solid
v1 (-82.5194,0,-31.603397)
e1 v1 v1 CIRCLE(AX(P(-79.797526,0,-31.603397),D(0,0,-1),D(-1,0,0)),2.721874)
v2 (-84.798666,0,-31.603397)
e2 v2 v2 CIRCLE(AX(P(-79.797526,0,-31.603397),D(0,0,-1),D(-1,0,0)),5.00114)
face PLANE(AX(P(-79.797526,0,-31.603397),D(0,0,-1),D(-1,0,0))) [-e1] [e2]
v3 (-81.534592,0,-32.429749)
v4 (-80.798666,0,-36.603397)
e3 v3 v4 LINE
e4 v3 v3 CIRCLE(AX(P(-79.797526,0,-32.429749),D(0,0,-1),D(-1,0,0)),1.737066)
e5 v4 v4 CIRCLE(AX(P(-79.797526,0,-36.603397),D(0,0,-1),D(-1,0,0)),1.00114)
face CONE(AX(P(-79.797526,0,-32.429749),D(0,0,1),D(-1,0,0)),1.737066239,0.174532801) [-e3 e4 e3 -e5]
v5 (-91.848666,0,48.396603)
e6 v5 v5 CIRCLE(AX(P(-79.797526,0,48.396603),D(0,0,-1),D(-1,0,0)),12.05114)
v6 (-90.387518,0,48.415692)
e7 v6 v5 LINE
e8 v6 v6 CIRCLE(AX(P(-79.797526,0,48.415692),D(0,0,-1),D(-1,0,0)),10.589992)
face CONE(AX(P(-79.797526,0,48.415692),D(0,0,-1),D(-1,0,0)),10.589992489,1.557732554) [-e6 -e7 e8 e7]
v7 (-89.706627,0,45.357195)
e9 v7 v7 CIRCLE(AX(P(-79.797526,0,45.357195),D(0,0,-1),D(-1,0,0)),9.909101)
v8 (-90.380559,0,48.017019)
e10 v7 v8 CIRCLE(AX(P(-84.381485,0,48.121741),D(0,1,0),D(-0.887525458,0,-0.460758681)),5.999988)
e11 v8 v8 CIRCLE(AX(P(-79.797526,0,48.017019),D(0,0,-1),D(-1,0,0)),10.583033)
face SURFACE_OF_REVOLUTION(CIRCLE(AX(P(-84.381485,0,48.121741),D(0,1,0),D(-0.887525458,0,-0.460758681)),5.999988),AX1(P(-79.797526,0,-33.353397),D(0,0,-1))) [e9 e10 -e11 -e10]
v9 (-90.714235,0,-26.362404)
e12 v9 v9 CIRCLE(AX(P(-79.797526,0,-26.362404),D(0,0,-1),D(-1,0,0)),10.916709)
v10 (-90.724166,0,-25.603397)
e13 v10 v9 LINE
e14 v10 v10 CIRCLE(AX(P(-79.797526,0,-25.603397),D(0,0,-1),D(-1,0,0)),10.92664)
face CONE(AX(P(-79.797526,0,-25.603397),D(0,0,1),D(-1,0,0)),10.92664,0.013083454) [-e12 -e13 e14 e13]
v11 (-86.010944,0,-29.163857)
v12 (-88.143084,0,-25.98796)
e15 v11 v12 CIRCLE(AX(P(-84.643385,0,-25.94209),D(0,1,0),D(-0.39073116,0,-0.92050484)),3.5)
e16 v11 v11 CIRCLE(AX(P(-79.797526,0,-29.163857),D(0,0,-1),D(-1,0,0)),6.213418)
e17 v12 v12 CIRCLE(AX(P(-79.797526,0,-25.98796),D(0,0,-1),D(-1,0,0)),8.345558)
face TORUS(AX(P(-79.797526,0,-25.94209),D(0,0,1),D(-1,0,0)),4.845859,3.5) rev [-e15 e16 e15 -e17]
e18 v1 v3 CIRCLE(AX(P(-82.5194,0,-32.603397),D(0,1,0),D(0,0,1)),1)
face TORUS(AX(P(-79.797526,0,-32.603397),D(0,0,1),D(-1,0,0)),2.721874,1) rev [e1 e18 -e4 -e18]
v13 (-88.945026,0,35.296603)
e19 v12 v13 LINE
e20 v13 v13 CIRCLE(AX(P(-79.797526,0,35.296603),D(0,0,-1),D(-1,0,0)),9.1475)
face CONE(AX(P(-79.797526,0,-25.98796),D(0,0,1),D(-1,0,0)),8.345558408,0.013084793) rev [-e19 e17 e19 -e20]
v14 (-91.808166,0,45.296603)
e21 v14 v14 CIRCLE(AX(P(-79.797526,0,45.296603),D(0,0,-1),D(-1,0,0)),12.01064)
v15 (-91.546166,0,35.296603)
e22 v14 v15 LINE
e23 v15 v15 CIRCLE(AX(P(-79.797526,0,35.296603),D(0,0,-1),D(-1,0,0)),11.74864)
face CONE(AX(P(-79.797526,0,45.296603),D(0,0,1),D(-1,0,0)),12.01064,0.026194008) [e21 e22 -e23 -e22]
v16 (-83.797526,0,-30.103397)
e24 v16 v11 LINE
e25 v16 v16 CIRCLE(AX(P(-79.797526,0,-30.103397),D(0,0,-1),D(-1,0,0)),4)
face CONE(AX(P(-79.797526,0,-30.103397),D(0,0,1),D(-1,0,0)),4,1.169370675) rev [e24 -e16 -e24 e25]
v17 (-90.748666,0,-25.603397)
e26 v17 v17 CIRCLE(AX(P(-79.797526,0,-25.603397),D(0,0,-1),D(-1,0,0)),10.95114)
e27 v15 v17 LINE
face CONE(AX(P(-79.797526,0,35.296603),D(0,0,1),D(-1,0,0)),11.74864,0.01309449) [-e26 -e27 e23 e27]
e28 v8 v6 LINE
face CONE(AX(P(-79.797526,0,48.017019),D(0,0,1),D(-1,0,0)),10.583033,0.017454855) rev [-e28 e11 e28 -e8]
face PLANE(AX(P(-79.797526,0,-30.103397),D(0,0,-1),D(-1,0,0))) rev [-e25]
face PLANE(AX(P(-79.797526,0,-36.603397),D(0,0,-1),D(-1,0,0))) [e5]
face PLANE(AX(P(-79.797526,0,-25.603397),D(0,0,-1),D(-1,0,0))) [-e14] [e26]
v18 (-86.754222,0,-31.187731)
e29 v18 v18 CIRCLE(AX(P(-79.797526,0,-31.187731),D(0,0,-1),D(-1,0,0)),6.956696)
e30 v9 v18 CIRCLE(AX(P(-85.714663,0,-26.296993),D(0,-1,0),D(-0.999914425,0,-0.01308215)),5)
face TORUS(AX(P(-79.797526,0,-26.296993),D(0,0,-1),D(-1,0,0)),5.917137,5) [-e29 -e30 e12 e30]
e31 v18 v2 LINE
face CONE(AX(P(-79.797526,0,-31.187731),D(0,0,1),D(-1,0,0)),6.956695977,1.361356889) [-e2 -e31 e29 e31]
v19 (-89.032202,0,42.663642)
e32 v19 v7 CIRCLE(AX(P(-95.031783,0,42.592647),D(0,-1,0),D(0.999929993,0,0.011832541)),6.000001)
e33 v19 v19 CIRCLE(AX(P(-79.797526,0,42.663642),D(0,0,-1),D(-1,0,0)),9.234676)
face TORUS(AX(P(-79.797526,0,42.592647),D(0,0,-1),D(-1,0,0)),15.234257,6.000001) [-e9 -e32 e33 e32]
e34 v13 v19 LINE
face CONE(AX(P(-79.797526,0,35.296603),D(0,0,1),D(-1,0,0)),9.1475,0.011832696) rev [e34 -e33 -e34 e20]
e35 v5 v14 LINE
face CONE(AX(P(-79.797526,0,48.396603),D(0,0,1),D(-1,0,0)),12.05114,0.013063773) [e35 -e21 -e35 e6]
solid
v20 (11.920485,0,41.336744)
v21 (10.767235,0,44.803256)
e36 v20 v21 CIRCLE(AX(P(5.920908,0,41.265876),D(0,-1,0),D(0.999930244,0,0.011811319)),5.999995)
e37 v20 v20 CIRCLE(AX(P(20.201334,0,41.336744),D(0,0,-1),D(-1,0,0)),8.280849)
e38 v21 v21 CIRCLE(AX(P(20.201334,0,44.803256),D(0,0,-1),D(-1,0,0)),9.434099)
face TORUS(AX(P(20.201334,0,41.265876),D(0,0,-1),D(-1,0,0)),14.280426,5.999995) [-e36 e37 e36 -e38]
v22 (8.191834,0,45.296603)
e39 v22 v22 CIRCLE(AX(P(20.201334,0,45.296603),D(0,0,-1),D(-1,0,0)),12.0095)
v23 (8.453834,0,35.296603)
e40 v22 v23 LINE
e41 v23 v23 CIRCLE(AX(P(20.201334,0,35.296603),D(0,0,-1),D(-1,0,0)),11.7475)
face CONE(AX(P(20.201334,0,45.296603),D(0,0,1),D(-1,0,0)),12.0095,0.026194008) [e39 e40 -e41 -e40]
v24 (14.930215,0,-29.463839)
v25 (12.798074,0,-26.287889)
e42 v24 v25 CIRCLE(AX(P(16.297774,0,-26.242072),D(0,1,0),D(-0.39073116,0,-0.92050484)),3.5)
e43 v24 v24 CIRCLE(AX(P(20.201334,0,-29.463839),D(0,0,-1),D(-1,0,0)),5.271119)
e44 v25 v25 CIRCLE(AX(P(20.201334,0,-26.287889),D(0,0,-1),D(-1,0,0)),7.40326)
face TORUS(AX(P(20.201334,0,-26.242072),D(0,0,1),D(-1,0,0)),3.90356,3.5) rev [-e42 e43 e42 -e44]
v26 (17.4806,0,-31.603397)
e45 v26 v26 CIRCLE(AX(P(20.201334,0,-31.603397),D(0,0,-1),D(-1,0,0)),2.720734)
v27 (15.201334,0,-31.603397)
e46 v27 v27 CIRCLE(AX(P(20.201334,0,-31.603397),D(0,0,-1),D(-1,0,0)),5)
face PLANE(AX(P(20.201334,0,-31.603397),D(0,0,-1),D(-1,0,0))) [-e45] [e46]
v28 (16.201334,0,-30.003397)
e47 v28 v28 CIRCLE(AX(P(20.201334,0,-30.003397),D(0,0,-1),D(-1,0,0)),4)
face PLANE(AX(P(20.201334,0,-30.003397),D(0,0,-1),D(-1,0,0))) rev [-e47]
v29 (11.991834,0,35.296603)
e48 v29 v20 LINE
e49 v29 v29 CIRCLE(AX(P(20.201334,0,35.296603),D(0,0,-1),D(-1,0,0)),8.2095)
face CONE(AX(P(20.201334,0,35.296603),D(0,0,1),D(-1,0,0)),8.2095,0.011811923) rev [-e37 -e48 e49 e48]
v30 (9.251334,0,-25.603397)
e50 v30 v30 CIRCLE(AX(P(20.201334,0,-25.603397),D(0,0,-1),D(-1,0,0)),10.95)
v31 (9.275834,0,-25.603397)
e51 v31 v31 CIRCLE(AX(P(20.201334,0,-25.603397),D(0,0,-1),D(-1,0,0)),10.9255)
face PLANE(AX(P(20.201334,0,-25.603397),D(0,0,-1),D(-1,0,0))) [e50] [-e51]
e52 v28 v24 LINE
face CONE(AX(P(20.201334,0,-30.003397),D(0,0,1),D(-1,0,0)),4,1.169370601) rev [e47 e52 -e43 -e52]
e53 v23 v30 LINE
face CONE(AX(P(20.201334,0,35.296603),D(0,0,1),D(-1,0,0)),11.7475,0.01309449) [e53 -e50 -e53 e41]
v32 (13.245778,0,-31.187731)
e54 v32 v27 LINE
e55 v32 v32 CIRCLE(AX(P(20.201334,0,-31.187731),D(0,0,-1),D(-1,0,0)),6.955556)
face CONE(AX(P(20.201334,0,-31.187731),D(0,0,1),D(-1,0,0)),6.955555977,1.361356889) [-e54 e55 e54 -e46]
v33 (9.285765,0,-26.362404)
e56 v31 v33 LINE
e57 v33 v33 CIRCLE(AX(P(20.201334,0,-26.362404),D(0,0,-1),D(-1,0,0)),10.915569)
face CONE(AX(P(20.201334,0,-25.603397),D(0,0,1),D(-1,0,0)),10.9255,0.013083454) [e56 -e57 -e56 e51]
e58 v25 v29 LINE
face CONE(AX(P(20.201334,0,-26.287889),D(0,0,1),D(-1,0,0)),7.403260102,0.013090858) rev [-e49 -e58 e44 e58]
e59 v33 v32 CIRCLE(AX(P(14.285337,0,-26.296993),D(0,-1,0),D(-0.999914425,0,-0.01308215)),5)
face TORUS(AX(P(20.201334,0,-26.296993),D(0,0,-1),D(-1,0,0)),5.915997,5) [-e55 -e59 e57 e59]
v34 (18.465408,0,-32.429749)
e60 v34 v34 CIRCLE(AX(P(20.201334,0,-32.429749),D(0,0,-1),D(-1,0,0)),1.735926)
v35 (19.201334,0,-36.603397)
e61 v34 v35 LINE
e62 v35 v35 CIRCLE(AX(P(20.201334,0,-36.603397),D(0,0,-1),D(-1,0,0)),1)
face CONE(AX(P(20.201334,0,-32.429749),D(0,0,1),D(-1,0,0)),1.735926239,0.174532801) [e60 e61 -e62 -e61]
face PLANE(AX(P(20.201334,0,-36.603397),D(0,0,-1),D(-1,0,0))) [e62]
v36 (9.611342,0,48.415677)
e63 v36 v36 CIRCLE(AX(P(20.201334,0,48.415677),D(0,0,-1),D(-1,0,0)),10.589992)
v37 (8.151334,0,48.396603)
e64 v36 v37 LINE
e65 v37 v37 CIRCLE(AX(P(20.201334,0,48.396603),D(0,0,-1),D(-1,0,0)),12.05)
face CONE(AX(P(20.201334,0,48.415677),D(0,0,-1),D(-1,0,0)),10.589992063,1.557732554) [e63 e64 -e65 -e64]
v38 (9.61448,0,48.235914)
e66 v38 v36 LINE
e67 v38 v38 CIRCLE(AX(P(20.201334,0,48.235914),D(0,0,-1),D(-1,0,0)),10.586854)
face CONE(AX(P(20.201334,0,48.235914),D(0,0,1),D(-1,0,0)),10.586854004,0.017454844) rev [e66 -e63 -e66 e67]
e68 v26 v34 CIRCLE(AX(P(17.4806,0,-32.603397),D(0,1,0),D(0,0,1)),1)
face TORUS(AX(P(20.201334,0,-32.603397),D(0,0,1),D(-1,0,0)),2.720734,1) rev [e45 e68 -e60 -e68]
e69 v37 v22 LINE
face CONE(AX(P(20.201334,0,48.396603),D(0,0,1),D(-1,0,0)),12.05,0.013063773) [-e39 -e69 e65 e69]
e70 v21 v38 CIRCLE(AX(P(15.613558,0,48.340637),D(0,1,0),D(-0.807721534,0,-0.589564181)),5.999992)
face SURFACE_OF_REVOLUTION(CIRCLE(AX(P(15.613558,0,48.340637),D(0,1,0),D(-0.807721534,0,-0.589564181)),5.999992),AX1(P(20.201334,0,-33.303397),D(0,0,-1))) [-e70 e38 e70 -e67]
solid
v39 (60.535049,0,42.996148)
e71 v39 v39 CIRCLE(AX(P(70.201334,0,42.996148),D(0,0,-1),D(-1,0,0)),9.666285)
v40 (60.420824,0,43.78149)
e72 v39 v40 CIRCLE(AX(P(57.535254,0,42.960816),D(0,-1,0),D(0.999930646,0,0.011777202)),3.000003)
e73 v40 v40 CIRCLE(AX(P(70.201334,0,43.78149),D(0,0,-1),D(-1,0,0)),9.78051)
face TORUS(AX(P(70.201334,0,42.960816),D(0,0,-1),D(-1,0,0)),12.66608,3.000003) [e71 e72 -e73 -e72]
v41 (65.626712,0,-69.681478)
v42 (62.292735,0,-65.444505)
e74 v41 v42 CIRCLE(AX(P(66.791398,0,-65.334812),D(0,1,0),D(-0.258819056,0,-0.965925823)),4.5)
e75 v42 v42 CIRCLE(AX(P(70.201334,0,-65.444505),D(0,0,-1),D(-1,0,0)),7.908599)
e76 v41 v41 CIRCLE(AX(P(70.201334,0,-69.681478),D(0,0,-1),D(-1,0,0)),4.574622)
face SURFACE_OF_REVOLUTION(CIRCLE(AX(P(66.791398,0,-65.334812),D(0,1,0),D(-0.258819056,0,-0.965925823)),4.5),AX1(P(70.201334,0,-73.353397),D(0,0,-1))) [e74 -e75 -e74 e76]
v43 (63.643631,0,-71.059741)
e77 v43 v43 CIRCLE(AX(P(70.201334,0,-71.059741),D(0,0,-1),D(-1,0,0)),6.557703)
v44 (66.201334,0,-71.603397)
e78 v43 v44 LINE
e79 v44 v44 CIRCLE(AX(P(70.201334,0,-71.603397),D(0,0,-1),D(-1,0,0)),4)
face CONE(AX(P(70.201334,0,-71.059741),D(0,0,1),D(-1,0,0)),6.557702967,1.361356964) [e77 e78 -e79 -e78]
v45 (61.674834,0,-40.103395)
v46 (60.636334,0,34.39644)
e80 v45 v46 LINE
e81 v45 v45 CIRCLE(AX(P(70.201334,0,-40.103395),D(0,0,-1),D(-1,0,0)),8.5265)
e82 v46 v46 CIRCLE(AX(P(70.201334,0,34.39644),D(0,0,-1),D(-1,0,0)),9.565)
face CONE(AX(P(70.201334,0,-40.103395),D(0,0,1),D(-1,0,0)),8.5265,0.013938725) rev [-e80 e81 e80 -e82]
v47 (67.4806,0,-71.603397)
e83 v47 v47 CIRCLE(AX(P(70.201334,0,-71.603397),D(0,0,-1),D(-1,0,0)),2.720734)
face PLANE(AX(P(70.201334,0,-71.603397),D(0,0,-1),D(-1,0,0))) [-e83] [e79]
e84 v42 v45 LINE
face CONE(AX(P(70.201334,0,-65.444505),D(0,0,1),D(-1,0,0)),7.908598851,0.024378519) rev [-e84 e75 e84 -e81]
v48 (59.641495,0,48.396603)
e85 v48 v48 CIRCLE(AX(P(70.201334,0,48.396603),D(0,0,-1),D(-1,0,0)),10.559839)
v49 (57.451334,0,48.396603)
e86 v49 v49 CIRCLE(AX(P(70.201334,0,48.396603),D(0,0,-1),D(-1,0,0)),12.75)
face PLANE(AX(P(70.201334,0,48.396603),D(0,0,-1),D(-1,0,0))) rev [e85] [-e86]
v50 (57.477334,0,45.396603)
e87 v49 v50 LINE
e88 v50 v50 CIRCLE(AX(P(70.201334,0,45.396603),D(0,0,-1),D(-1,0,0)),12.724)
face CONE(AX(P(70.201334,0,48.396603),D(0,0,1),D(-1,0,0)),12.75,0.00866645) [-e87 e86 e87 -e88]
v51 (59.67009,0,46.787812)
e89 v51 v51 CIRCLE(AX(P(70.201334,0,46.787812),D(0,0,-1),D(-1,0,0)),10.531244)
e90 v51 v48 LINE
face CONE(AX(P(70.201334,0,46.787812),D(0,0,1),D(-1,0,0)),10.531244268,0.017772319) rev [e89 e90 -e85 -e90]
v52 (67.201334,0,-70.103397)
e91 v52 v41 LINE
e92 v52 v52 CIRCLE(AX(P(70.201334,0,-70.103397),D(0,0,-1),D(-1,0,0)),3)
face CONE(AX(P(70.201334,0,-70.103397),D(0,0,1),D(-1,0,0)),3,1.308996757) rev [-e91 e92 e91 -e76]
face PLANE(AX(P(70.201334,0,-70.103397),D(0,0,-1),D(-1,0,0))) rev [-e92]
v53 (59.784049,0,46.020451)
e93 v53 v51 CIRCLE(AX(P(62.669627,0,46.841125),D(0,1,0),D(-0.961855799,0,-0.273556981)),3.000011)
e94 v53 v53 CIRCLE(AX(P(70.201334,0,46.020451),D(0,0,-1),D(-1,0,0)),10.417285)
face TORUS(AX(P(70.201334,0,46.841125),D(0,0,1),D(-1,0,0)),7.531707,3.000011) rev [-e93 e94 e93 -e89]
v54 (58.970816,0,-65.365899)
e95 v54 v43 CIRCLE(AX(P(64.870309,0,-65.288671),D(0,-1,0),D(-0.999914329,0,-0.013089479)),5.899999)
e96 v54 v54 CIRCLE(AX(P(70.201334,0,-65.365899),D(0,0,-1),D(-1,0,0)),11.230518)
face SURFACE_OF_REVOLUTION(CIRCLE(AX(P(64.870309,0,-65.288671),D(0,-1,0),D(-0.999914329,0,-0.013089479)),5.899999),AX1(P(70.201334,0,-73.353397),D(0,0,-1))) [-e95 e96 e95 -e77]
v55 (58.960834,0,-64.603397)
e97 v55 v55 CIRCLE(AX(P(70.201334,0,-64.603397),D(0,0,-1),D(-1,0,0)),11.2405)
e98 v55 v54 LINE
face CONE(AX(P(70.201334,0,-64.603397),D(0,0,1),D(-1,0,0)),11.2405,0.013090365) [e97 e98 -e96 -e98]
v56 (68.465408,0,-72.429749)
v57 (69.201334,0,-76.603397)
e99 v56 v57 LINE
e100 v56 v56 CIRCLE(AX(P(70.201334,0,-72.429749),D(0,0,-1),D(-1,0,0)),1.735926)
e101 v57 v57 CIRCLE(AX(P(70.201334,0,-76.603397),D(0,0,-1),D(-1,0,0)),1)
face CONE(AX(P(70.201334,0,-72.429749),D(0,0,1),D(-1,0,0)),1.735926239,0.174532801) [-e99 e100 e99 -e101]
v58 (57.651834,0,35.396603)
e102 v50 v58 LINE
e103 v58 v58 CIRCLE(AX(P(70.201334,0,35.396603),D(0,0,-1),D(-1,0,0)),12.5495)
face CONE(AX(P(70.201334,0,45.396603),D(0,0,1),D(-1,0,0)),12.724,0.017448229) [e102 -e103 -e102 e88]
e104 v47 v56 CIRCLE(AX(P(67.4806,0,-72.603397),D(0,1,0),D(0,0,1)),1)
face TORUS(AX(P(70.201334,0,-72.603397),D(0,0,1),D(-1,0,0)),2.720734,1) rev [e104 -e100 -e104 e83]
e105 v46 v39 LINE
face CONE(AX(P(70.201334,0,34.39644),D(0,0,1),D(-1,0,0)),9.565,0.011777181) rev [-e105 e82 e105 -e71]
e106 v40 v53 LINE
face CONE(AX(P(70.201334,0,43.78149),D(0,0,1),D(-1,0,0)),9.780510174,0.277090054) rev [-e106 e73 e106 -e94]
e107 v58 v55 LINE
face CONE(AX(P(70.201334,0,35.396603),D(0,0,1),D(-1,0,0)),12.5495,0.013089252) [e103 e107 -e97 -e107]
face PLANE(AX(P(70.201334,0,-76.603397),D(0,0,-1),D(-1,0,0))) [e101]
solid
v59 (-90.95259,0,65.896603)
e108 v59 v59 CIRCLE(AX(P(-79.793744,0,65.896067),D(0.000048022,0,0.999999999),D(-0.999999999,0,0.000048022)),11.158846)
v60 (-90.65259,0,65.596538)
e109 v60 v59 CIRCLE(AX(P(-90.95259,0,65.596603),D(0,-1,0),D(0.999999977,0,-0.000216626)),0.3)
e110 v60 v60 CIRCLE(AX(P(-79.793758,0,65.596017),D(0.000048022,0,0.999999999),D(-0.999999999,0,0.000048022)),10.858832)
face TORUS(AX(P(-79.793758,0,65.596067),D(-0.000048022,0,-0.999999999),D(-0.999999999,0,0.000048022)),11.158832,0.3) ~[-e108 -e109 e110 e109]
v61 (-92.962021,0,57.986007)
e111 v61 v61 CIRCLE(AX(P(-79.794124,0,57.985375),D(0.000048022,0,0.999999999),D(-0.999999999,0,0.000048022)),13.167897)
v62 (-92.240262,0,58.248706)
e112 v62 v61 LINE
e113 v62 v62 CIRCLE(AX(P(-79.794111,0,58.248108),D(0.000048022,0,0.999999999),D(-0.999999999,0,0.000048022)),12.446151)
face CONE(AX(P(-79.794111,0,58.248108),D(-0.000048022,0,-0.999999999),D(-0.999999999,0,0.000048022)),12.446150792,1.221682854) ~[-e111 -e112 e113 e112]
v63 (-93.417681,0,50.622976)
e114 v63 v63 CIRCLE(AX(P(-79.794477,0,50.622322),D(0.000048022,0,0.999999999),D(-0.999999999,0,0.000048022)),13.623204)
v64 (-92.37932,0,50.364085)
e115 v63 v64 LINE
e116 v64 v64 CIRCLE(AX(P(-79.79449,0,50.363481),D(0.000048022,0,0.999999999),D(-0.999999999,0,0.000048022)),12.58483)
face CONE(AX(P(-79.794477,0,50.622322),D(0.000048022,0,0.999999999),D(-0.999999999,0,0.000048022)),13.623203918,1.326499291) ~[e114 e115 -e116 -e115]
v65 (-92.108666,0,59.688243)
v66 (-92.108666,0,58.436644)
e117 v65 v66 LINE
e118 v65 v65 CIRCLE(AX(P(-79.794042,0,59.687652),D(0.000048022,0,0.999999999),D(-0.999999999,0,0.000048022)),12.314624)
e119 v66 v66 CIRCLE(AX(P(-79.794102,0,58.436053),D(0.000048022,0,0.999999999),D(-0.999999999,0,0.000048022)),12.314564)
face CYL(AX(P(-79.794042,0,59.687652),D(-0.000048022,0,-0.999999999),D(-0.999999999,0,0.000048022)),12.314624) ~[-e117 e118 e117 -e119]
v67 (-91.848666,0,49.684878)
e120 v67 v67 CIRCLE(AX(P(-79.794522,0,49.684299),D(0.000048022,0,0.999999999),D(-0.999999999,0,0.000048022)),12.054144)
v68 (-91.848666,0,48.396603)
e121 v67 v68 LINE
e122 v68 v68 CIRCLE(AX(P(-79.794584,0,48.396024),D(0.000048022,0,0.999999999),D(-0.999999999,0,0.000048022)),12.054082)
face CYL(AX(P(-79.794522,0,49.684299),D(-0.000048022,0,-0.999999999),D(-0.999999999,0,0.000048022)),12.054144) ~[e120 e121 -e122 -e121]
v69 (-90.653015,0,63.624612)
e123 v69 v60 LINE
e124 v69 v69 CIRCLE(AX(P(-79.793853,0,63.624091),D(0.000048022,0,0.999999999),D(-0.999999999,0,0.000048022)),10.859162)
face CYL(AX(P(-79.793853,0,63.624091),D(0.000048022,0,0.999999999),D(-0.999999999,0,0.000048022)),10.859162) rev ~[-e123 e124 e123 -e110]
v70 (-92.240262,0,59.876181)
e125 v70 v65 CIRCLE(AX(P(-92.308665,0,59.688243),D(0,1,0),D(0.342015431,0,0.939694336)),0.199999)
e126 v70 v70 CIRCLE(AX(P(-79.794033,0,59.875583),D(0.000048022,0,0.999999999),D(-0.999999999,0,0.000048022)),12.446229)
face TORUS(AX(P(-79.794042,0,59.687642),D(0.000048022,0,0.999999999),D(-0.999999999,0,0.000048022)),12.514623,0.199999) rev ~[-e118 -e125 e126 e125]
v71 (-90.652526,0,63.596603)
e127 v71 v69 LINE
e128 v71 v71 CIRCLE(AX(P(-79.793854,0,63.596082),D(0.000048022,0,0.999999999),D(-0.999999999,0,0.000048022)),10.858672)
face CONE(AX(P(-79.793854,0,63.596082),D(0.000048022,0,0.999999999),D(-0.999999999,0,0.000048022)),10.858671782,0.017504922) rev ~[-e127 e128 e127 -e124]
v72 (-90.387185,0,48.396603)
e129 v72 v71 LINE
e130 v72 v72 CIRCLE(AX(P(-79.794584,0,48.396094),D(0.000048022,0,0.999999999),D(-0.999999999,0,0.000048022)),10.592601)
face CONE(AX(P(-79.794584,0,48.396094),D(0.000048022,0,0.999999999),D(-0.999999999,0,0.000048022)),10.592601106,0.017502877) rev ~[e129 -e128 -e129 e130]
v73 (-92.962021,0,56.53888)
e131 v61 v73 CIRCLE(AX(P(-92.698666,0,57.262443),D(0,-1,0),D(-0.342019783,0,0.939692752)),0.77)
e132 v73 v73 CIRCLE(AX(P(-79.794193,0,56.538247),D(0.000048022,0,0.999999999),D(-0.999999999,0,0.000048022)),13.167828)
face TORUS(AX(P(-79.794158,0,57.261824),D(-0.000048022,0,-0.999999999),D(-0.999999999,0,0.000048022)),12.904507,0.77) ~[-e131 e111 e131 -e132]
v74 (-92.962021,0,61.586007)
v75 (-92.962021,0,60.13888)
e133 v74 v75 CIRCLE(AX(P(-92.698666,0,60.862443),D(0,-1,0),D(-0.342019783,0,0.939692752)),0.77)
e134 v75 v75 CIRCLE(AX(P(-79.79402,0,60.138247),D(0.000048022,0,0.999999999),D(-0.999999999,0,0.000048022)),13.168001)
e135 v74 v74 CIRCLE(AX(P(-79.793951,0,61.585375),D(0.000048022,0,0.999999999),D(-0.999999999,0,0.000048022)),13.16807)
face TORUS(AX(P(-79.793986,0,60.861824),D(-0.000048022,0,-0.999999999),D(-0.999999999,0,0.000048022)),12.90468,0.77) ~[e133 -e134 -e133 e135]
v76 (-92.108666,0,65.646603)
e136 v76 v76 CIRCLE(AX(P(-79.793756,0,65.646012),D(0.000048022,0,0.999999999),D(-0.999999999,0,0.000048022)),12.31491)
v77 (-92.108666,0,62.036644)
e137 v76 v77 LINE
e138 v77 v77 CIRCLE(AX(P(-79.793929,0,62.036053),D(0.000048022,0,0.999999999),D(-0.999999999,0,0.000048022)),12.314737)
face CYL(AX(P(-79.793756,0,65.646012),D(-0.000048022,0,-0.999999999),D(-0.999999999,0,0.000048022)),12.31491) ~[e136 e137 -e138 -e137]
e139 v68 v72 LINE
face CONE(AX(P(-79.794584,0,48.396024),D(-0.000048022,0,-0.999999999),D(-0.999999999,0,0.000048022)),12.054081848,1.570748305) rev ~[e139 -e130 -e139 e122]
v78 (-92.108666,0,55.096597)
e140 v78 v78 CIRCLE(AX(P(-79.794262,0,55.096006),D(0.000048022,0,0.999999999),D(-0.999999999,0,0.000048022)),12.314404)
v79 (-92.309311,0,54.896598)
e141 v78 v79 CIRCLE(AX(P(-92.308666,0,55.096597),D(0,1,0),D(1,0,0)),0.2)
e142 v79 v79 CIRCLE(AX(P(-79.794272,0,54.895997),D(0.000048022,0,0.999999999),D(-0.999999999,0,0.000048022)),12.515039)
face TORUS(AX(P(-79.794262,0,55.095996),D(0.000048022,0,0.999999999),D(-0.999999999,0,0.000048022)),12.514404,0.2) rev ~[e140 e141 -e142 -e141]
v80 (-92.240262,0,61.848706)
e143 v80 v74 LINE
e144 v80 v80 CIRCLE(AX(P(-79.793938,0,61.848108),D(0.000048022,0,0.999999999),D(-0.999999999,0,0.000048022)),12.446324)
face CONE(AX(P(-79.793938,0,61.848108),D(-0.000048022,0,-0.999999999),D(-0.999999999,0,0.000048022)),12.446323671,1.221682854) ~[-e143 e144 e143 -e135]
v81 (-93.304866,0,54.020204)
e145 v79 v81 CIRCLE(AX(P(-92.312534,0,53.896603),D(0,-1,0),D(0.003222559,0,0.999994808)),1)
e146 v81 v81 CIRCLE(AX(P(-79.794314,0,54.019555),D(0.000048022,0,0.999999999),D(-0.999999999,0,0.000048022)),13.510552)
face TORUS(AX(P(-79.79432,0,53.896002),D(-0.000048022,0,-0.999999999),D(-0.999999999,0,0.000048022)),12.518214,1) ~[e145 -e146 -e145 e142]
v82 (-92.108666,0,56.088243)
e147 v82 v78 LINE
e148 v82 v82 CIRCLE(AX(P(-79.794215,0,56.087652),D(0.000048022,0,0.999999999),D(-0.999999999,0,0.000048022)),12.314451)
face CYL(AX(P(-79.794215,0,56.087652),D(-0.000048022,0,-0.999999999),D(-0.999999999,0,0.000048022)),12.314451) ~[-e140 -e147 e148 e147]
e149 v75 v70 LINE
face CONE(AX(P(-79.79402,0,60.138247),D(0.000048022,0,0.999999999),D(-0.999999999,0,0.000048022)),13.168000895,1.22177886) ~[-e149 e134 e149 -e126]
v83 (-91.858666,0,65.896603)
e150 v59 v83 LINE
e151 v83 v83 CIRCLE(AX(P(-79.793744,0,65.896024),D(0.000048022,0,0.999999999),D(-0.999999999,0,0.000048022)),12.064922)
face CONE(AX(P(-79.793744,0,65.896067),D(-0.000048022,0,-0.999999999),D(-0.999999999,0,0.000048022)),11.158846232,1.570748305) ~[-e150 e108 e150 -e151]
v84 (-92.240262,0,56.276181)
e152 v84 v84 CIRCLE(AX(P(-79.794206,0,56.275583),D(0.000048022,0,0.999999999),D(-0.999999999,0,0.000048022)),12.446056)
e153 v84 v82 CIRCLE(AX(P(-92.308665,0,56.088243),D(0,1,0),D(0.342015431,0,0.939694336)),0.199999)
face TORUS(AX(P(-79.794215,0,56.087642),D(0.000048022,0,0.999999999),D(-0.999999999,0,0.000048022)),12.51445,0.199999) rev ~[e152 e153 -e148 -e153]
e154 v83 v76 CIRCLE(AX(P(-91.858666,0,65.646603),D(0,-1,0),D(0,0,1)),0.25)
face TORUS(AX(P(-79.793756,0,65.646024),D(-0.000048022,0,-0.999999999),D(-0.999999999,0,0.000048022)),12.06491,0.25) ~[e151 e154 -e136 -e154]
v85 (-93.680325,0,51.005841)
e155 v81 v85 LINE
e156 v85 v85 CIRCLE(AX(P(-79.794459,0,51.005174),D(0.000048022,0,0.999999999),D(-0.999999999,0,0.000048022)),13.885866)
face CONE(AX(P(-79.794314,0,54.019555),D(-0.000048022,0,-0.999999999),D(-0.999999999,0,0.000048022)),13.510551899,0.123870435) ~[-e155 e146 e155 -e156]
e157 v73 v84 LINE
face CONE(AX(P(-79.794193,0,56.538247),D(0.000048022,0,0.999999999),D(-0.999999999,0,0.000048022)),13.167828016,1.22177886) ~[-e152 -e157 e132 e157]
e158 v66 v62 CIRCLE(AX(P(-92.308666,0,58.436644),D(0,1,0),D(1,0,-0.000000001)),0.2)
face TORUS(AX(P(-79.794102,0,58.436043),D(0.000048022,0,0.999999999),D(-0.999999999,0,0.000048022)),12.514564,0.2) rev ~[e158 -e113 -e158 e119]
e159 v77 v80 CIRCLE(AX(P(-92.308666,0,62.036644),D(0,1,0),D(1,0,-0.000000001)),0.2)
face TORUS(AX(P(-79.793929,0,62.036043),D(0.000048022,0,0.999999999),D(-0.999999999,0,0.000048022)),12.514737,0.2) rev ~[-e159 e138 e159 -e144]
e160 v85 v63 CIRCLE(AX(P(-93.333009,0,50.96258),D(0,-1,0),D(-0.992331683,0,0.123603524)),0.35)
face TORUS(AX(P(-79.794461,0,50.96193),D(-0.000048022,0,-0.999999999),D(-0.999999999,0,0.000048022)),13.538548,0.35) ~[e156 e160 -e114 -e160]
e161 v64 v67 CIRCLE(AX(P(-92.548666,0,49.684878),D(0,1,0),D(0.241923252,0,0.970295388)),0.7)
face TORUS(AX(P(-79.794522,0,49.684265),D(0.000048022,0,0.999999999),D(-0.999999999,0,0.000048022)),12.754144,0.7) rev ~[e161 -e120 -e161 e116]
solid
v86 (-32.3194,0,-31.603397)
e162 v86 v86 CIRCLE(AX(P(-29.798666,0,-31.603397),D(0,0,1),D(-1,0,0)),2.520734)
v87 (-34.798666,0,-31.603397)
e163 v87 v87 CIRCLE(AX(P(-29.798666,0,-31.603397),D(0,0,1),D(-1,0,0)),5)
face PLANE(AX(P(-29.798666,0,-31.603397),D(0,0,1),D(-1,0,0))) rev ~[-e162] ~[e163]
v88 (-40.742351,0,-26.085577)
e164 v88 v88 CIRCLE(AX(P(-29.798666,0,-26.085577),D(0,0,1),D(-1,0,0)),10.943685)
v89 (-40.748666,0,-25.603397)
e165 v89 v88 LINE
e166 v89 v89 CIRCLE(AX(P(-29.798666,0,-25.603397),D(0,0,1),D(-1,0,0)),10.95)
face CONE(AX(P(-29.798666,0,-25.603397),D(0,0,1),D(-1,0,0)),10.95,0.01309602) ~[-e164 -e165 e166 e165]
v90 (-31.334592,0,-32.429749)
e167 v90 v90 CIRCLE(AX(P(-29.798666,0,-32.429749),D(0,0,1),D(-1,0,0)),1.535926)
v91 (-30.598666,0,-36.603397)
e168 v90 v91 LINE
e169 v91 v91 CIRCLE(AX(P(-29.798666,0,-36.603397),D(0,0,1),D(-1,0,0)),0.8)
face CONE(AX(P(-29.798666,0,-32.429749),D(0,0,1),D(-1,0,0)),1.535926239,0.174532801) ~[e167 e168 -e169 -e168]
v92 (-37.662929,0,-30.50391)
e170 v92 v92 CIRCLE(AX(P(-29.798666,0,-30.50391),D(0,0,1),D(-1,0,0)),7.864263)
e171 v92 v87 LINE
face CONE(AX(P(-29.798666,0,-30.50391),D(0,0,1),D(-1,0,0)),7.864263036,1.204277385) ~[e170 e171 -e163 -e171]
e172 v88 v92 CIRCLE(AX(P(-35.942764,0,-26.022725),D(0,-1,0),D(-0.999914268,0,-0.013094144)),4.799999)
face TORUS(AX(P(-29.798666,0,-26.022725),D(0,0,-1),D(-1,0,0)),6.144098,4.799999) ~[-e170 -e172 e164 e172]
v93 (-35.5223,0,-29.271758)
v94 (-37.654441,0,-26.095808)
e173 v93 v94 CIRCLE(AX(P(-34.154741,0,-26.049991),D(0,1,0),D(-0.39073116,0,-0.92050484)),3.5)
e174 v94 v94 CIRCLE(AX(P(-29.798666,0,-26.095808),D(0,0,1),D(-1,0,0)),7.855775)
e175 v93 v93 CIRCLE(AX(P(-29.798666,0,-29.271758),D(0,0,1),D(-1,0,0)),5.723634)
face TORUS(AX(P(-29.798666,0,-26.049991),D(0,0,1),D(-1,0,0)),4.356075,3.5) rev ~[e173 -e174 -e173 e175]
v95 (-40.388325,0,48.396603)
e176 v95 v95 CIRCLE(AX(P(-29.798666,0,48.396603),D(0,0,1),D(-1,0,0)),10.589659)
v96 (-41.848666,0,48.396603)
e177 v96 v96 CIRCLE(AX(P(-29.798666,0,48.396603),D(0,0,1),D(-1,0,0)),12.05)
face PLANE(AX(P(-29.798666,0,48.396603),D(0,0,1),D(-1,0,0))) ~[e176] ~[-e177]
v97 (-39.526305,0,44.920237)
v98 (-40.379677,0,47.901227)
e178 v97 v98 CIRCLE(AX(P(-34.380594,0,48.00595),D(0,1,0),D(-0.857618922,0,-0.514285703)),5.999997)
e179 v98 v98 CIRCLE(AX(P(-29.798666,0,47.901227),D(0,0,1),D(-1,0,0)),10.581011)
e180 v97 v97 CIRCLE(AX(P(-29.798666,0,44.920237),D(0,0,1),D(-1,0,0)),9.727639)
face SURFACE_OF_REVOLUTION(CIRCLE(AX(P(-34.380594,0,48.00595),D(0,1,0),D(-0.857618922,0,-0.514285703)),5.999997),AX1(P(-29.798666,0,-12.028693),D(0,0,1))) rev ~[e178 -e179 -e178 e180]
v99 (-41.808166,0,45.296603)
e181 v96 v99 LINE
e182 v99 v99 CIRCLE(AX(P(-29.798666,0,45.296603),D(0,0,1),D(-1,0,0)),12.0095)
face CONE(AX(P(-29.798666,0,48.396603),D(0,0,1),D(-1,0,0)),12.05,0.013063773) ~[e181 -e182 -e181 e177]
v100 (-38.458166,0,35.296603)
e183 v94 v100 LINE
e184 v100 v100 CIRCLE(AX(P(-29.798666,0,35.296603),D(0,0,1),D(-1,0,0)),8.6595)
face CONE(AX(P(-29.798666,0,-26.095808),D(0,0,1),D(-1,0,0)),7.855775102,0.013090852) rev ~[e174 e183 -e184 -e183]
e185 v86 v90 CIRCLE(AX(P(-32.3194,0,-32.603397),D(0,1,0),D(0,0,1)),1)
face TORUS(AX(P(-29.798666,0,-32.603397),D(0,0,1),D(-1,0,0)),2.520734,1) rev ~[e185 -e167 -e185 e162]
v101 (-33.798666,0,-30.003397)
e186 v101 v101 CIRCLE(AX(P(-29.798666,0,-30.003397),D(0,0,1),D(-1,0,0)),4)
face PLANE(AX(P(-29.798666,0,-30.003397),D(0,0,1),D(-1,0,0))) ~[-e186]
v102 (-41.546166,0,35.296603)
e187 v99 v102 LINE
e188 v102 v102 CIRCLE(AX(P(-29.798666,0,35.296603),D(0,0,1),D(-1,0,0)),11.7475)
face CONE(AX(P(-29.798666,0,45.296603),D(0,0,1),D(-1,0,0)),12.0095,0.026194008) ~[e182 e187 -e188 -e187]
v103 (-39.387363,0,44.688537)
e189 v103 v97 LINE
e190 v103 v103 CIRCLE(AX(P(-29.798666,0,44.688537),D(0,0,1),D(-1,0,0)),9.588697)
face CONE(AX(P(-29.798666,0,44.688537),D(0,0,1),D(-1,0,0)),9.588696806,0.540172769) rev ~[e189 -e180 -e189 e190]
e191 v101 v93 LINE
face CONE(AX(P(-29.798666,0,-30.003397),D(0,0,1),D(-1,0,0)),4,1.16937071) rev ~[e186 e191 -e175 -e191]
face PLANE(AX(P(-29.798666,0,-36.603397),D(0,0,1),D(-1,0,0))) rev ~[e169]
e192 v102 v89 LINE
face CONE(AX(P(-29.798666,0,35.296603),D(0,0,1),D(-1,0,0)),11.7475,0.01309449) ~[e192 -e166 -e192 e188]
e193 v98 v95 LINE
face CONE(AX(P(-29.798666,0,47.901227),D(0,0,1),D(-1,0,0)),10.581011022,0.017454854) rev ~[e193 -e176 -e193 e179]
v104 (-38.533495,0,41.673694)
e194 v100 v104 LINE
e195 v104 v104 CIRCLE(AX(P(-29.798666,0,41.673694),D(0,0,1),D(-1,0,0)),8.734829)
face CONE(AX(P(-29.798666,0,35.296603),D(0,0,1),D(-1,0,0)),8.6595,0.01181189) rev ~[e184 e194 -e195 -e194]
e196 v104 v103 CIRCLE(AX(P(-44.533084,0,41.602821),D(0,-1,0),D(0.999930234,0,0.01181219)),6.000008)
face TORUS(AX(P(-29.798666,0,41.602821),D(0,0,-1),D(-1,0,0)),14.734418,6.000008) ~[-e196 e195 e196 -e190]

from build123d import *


# Not quite as in the source:
# - ends of sketch curves that miss each other by under 0.0002 mm in the source are joined


with BuildPart() as f2:
    # F1 (on Front) → F2 (revolve)
    with BuildSketch(Plane.XZ):
        with BuildLine():
            Line((-90.380559, 48.017019), (-90.3875184894, 48.4156921852))
            Line((-90.3875184894, 48.4156921852), (-91.848666, 48.396603))
            Line((-91.848666, 48.396603), (-91.808166, 45.296603))
            Line((-91.808166, 45.296603), (-91.546166, 35.296603))
            Line((-91.546166, 35.296603), (-90.748666, -25.603397))
            Line((-90.748666, -25.603397), (-90.724166, -25.603397))
            Line((-90.724166, -25.603397), (-90.714235, -26.362404))
            ThreePointArc((-90.714235, -26.362404), (-89.5797271662, -29.4689449214), (-86.7542219771, -31.1877308925))
            Line((-86.7542219771, -31.1877308925), (-84.798666, -31.603397))
            Line((-84.798666, -31.603397), (-82.5194, -31.603397))
            ThreePointArc((-82.5194, -31.603397), (-81.8766123734, -31.8373525711), (-81.5345922393, -32.4297488659))
            Line((-81.5345922393, -32.4297488659), (-80.798666, -36.603397))
            Line((-80.798666, -36.603397), (-79.797526, -36.603397))
            Line((-79.797526, -36.603397), (-79.797526, -30.103397))
            Line((-79.797526, -30.103397), (-83.797526, -30.103397))
            Line((-83.797526, -30.103397), (-86.010944, -29.163857))
            ThreePointArc((-86.010944, -29.163857), (-87.5492637787, -27.8929535328), (-88.1430844076, -25.9879599922))
            Line((-88.1430844076, -25.9879599922), (-88.945026, 35.296603))
            Line((-88.945026, 35.296603), (-89.032202, 42.663642))
            ThreePointArc((-89.032202, 42.663642), (-89.2114545385, 44.0499692845), (-89.7066271049, 45.3571949455))
            ThreePointArc((-89.7066271049, 45.3571949455), (-90.1976808008, 46.6480650102), (-90.380559, 48.017019))
        make_face()
    revolve(axis=Axis((-79.797526, 0, -33.353397), (0, 0, -1)))


with BuildPart() as f4:
    # F3 (on Front) → F4 (revolve)
    with BuildSketch(Plane.XZ):
        with BuildLine():
            Line((-90.3871852566, 48.396603), (-90.652526, 63.596603))
            Line((-90.652526, 63.596603), (-90.653015, 63.624612))
            Line((-90.653015, 63.624612), (-90.65259, 65.596538))
            ThreePointArc((-90.65259, 65.596538), (-90.7404349859, 65.8087120521), (-90.95259, 65.896603))
            Line((-90.95259, 65.896603), (-91.858666, 65.896603))
            ThreePointArc((-91.858666, 65.896603), (-92.0354426953, 65.8233796953), (-92.108666, 65.646603))
            Line((-92.108666, 65.646603), (-92.108666, 62.896603))
            Line((-92.108666, 62.896603), (-92.108666, 62.036644))
            ThreePointArc((-92.108666, 62.036644), (-92.1448355475, 61.9219287751), (-92.2402618282, 61.8487055279))
            Line((-92.2402618282, 61.8487055279), (-92.962021, 61.586007))
            ThreePointArc((-92.962021, 61.586007), (-93.468666, 60.862443171), (-92.9620211619, 60.1388795552))
            Line((-92.9620211619, 60.1388795552), (-92.240262, 59.876181))
            ThreePointArc((-92.240262, 59.876181), (-92.1448355475, 59.8029582249), (-92.108666, 59.688243))
            Line((-92.108666, 59.688243), (-92.108666, 58.436644))
            ThreePointArc((-92.108666, 58.436644), (-92.1448355475, 58.3219287751), (-92.2402618282, 58.2487055279))
            Line((-92.2402618282, 58.2487055279), (-92.962021, 57.986007))
            ThreePointArc((-92.962021, 57.986007), (-93.468666, 57.262443171), (-92.9620211619, 56.5388795552))
            Line((-92.9620211619, 56.5388795552), (-92.240262, 56.276181))
            ThreePointArc((-92.240262, 56.276181), (-92.1448355475, 56.2029582249), (-92.108666, 56.088243))
            Line((-92.108666, 56.088243), (-92.108666, 55.096597))
            ThreePointArc((-92.108666, 55.096597), (-92.1674728698, 54.9549477854), (-92.3093109999, 54.8965980401))
            ThreePointArc((-92.3093109999, 54.8965980401), (-92.9732916549, 54.6472023083), (-93.3048659973, 54.0202039997))
            Line((-93.3048659973, 54.0202039997), (-93.680325, 51.005841))
            ThreePointArc((-93.680325, 51.005841), (-93.6216260494, 50.7645895992), (-93.4176811572, 50.6229763696))
            Line((-93.4176811572, 50.6229763696), (-92.37932, 50.364085))
            ThreePointArc((-92.37932, 50.364085), (-91.9970582708, 50.1158407746), (-91.848666, 49.684878))
            Line((-91.848666, 49.684878), (-91.848666, 48.396603))
            Line((-91.848666, 48.396603), (-90.3871852566, 48.396603))
        make_face()
    revolve(axis=Axis((-79.798096, 0, -24.73381686), (4.80219e-05, 0, 0.9999999988)))


with BuildPart() as f6:
    # F5 (on Front) → F6 (revolve)
    with BuildSketch(Plane.XZ):
        with BuildLine():
            Line((-41.848666, 48.396603), (-41.808166, 45.296603))
            Line((-41.808166, 45.296603), (-41.546166, 35.296603))
            Line((-41.546166, 35.296603), (-40.748666, -25.603397))
            Line((-40.748666, -25.603397), (-40.742351, -26.085577))
            ThreePointArc((-40.742351, -26.085577), (-39.8806833305, -28.7673156764), (-37.6629290361, -30.5039100939))
            Line((-37.6629290361, -30.5039100939), (-34.798666, -31.603397))
            Line((-34.798666, -31.603397), (-32.3194, -31.603397))
            ThreePointArc((-32.3194, -31.603397), (-31.6766123734, -31.8373525711), (-31.3345922393, -32.4297488659))
            Line((-31.3345922393, -32.4297488659), (-30.598666, -36.603397))
            Line((-30.598666, -36.603397), (-29.798666, -36.603397))
            Line((-29.798666, -36.603397), (-29.798666, -30.003397))
            Line((-29.798666, -30.003397), (-33.798666, -30.003397))
            Line((-33.798666, -30.003397), (-35.5223, -29.271758))
            ThreePointArc((-35.5223, -29.271758), (-37.0606345482, -28.0008325329), (-37.6544411018, -26.0958080013))
            Line((-37.6544411018, -26.0958080013), (-38.458166, 35.296603))
            Line((-38.458166, 35.296603), (-38.533495, 41.673694))
            ThreePointArc((-38.533495, 41.673694), (-38.7601467692, 43.2378397645), (-39.3873628062, 44.6885371162))
            Line((-39.3873628062, 44.6885371162), (-39.526305, 44.920237))
            ThreePointArc((-39.526305, 44.920237), (-40.1488852433, 46.3546530786), (-40.3796770215, 47.9012269996))
            Line((-40.3796770215, 47.9012269996), (-40.3883246154, 48.396603))
            Line((-40.3883246154, 48.396603), (-41.848666, 48.396603))
        make_face()
    revolve(axis=Axis((-29.798666, 0, -12.0286933423), (0, 0, 1)))


with BuildPart() as f8:
    # F7 (on Front) → F8 (revolve)
    with BuildSketch(Plane.XZ):
        with BuildLine():
            Line((9.611341937, 48.4156772972), (8.151334, 48.396603))
            Line((8.151334, 48.396603), (8.191834, 45.296603))
            Line((8.191834, 45.296603), (8.453834, 35.296603))
            Line((8.453834, 35.296603), (9.251334, -25.603397))
            Line((9.251334, -25.603397), (9.275834, -25.603397))
            Line((9.275834, -25.603397), (9.285765, -26.362404))
            ThreePointArc((9.285765, -26.362404), (10.4202728338, -29.4689449214), (13.2457780229, -31.1877308925))
            Line((13.2457780229, -31.1877308925), (15.201334, -31.603397))
            Line((15.201334, -31.603397), (17.4806, -31.603397))
            ThreePointArc((17.4806, -31.603397), (18.1233876266, -31.8373525711), (18.4654077607, -32.4297488659))
            Line((18.4654077607, -32.4297488659), (19.201334, -36.603397))
            Line((19.201334, -36.603397), (20.201334, -36.603397))
            Line((20.201334, -36.603397), (20.201334, -30.003397))
            Line((20.201334, -30.003397), (16.201334, -30.003397))
            Line((16.201334, -30.003397), (14.930215, -29.463839))
            ThreePointArc((14.930215, -29.463839), (13.3918804518, -28.1929135329), (12.7980738982, -26.2878890013))
            Line((12.7980738982, -26.2878890013), (11.991834, 35.296603))
            Line((11.991834, 35.296603), (11.920485, 41.336744))
            ThreePointArc((11.920485, 41.336744), (11.6141133324, 43.1599087139), (10.7672352978, 44.8032562174))
            ThreePointArc((10.7672352978, 44.8032562174), (9.9257232875, 46.4305476153), (9.614479996, 48.235914))
            Line((9.614479996, 48.235914), (9.611341937, 48.4156772972))
        make_face()
    revolve(axis=Axis((20.201334, 0, -33.303397), (0, 0, -1)))


with BuildPart() as f10:
    # F9 (on Front) → F10 (revolve)
    with BuildSketch(Plane.XZ):
        with BuildLine():
            Line((59.6414947748, 48.396603), (57.451334, 48.396603))
            Line((57.451334, 48.396603), (57.477334, 45.396603))
            Line((57.477334, 45.396603), (57.651834, 35.396603))
            Line((57.651834, 35.396603), (58.960834, -64.603397))
            Line((58.960834, -64.603397), (58.970816, -65.365899))
            ThreePointArc((58.970816, -65.365899), (60.3095484526, -69.0315905319), (63.6436310327, -71.0597408461))
            Line((63.6436310327, -71.0597408461), (66.201334, -71.603397))
            Line((66.201334, -71.603397), (67.4806, -71.603397))
            ThreePointArc((67.4806, -71.603397), (68.1233876266, -71.8373525711), (68.4654077607, -72.4297488659))
            Line((68.4654077607, -72.4297488659), (69.201334, -76.603397))
            Line((69.201334, -76.603397), (70.201334, -76.603397))
            Line((70.201334, -76.603397), (70.201334, -70.103397))
            Line((70.201334, -70.103397), (67.201334, -70.103397))
            Line((67.201334, -70.103397), (65.626712, -69.681478))
            ThreePointArc((65.626712, -69.681478), (63.2549639935, -68.1175506721), (62.292735149, -65.4445049964))
            Line((62.292735149, -65.4445049964), (61.674834, -40.103395))
            Line((61.674834, -40.103395), (60.636334, 34.39644))
            Line((60.636334, 34.39644), (60.535049, 42.996148))
            ThreePointArc((60.535049, 42.996148), (60.5040197835, 43.3926127099), (60.4208238262, 43.7814899506))
            Line((60.4208238262, 43.7814899506), (59.784049, 46.020451))
            ThreePointArc((59.784049, 46.020451), (59.7021607108, 46.4004323773), (59.6700897321, 46.787812013))
            Line((59.6700897321, 46.787812013), (59.6414947748, 48.396603))
        make_face()
    revolve(axis=Axis((70.201334, 0, -73.353397), (0, 0, -1)))


solid = Compound([f2.part, f4.part, f6.part, f8.part, f10.part])
